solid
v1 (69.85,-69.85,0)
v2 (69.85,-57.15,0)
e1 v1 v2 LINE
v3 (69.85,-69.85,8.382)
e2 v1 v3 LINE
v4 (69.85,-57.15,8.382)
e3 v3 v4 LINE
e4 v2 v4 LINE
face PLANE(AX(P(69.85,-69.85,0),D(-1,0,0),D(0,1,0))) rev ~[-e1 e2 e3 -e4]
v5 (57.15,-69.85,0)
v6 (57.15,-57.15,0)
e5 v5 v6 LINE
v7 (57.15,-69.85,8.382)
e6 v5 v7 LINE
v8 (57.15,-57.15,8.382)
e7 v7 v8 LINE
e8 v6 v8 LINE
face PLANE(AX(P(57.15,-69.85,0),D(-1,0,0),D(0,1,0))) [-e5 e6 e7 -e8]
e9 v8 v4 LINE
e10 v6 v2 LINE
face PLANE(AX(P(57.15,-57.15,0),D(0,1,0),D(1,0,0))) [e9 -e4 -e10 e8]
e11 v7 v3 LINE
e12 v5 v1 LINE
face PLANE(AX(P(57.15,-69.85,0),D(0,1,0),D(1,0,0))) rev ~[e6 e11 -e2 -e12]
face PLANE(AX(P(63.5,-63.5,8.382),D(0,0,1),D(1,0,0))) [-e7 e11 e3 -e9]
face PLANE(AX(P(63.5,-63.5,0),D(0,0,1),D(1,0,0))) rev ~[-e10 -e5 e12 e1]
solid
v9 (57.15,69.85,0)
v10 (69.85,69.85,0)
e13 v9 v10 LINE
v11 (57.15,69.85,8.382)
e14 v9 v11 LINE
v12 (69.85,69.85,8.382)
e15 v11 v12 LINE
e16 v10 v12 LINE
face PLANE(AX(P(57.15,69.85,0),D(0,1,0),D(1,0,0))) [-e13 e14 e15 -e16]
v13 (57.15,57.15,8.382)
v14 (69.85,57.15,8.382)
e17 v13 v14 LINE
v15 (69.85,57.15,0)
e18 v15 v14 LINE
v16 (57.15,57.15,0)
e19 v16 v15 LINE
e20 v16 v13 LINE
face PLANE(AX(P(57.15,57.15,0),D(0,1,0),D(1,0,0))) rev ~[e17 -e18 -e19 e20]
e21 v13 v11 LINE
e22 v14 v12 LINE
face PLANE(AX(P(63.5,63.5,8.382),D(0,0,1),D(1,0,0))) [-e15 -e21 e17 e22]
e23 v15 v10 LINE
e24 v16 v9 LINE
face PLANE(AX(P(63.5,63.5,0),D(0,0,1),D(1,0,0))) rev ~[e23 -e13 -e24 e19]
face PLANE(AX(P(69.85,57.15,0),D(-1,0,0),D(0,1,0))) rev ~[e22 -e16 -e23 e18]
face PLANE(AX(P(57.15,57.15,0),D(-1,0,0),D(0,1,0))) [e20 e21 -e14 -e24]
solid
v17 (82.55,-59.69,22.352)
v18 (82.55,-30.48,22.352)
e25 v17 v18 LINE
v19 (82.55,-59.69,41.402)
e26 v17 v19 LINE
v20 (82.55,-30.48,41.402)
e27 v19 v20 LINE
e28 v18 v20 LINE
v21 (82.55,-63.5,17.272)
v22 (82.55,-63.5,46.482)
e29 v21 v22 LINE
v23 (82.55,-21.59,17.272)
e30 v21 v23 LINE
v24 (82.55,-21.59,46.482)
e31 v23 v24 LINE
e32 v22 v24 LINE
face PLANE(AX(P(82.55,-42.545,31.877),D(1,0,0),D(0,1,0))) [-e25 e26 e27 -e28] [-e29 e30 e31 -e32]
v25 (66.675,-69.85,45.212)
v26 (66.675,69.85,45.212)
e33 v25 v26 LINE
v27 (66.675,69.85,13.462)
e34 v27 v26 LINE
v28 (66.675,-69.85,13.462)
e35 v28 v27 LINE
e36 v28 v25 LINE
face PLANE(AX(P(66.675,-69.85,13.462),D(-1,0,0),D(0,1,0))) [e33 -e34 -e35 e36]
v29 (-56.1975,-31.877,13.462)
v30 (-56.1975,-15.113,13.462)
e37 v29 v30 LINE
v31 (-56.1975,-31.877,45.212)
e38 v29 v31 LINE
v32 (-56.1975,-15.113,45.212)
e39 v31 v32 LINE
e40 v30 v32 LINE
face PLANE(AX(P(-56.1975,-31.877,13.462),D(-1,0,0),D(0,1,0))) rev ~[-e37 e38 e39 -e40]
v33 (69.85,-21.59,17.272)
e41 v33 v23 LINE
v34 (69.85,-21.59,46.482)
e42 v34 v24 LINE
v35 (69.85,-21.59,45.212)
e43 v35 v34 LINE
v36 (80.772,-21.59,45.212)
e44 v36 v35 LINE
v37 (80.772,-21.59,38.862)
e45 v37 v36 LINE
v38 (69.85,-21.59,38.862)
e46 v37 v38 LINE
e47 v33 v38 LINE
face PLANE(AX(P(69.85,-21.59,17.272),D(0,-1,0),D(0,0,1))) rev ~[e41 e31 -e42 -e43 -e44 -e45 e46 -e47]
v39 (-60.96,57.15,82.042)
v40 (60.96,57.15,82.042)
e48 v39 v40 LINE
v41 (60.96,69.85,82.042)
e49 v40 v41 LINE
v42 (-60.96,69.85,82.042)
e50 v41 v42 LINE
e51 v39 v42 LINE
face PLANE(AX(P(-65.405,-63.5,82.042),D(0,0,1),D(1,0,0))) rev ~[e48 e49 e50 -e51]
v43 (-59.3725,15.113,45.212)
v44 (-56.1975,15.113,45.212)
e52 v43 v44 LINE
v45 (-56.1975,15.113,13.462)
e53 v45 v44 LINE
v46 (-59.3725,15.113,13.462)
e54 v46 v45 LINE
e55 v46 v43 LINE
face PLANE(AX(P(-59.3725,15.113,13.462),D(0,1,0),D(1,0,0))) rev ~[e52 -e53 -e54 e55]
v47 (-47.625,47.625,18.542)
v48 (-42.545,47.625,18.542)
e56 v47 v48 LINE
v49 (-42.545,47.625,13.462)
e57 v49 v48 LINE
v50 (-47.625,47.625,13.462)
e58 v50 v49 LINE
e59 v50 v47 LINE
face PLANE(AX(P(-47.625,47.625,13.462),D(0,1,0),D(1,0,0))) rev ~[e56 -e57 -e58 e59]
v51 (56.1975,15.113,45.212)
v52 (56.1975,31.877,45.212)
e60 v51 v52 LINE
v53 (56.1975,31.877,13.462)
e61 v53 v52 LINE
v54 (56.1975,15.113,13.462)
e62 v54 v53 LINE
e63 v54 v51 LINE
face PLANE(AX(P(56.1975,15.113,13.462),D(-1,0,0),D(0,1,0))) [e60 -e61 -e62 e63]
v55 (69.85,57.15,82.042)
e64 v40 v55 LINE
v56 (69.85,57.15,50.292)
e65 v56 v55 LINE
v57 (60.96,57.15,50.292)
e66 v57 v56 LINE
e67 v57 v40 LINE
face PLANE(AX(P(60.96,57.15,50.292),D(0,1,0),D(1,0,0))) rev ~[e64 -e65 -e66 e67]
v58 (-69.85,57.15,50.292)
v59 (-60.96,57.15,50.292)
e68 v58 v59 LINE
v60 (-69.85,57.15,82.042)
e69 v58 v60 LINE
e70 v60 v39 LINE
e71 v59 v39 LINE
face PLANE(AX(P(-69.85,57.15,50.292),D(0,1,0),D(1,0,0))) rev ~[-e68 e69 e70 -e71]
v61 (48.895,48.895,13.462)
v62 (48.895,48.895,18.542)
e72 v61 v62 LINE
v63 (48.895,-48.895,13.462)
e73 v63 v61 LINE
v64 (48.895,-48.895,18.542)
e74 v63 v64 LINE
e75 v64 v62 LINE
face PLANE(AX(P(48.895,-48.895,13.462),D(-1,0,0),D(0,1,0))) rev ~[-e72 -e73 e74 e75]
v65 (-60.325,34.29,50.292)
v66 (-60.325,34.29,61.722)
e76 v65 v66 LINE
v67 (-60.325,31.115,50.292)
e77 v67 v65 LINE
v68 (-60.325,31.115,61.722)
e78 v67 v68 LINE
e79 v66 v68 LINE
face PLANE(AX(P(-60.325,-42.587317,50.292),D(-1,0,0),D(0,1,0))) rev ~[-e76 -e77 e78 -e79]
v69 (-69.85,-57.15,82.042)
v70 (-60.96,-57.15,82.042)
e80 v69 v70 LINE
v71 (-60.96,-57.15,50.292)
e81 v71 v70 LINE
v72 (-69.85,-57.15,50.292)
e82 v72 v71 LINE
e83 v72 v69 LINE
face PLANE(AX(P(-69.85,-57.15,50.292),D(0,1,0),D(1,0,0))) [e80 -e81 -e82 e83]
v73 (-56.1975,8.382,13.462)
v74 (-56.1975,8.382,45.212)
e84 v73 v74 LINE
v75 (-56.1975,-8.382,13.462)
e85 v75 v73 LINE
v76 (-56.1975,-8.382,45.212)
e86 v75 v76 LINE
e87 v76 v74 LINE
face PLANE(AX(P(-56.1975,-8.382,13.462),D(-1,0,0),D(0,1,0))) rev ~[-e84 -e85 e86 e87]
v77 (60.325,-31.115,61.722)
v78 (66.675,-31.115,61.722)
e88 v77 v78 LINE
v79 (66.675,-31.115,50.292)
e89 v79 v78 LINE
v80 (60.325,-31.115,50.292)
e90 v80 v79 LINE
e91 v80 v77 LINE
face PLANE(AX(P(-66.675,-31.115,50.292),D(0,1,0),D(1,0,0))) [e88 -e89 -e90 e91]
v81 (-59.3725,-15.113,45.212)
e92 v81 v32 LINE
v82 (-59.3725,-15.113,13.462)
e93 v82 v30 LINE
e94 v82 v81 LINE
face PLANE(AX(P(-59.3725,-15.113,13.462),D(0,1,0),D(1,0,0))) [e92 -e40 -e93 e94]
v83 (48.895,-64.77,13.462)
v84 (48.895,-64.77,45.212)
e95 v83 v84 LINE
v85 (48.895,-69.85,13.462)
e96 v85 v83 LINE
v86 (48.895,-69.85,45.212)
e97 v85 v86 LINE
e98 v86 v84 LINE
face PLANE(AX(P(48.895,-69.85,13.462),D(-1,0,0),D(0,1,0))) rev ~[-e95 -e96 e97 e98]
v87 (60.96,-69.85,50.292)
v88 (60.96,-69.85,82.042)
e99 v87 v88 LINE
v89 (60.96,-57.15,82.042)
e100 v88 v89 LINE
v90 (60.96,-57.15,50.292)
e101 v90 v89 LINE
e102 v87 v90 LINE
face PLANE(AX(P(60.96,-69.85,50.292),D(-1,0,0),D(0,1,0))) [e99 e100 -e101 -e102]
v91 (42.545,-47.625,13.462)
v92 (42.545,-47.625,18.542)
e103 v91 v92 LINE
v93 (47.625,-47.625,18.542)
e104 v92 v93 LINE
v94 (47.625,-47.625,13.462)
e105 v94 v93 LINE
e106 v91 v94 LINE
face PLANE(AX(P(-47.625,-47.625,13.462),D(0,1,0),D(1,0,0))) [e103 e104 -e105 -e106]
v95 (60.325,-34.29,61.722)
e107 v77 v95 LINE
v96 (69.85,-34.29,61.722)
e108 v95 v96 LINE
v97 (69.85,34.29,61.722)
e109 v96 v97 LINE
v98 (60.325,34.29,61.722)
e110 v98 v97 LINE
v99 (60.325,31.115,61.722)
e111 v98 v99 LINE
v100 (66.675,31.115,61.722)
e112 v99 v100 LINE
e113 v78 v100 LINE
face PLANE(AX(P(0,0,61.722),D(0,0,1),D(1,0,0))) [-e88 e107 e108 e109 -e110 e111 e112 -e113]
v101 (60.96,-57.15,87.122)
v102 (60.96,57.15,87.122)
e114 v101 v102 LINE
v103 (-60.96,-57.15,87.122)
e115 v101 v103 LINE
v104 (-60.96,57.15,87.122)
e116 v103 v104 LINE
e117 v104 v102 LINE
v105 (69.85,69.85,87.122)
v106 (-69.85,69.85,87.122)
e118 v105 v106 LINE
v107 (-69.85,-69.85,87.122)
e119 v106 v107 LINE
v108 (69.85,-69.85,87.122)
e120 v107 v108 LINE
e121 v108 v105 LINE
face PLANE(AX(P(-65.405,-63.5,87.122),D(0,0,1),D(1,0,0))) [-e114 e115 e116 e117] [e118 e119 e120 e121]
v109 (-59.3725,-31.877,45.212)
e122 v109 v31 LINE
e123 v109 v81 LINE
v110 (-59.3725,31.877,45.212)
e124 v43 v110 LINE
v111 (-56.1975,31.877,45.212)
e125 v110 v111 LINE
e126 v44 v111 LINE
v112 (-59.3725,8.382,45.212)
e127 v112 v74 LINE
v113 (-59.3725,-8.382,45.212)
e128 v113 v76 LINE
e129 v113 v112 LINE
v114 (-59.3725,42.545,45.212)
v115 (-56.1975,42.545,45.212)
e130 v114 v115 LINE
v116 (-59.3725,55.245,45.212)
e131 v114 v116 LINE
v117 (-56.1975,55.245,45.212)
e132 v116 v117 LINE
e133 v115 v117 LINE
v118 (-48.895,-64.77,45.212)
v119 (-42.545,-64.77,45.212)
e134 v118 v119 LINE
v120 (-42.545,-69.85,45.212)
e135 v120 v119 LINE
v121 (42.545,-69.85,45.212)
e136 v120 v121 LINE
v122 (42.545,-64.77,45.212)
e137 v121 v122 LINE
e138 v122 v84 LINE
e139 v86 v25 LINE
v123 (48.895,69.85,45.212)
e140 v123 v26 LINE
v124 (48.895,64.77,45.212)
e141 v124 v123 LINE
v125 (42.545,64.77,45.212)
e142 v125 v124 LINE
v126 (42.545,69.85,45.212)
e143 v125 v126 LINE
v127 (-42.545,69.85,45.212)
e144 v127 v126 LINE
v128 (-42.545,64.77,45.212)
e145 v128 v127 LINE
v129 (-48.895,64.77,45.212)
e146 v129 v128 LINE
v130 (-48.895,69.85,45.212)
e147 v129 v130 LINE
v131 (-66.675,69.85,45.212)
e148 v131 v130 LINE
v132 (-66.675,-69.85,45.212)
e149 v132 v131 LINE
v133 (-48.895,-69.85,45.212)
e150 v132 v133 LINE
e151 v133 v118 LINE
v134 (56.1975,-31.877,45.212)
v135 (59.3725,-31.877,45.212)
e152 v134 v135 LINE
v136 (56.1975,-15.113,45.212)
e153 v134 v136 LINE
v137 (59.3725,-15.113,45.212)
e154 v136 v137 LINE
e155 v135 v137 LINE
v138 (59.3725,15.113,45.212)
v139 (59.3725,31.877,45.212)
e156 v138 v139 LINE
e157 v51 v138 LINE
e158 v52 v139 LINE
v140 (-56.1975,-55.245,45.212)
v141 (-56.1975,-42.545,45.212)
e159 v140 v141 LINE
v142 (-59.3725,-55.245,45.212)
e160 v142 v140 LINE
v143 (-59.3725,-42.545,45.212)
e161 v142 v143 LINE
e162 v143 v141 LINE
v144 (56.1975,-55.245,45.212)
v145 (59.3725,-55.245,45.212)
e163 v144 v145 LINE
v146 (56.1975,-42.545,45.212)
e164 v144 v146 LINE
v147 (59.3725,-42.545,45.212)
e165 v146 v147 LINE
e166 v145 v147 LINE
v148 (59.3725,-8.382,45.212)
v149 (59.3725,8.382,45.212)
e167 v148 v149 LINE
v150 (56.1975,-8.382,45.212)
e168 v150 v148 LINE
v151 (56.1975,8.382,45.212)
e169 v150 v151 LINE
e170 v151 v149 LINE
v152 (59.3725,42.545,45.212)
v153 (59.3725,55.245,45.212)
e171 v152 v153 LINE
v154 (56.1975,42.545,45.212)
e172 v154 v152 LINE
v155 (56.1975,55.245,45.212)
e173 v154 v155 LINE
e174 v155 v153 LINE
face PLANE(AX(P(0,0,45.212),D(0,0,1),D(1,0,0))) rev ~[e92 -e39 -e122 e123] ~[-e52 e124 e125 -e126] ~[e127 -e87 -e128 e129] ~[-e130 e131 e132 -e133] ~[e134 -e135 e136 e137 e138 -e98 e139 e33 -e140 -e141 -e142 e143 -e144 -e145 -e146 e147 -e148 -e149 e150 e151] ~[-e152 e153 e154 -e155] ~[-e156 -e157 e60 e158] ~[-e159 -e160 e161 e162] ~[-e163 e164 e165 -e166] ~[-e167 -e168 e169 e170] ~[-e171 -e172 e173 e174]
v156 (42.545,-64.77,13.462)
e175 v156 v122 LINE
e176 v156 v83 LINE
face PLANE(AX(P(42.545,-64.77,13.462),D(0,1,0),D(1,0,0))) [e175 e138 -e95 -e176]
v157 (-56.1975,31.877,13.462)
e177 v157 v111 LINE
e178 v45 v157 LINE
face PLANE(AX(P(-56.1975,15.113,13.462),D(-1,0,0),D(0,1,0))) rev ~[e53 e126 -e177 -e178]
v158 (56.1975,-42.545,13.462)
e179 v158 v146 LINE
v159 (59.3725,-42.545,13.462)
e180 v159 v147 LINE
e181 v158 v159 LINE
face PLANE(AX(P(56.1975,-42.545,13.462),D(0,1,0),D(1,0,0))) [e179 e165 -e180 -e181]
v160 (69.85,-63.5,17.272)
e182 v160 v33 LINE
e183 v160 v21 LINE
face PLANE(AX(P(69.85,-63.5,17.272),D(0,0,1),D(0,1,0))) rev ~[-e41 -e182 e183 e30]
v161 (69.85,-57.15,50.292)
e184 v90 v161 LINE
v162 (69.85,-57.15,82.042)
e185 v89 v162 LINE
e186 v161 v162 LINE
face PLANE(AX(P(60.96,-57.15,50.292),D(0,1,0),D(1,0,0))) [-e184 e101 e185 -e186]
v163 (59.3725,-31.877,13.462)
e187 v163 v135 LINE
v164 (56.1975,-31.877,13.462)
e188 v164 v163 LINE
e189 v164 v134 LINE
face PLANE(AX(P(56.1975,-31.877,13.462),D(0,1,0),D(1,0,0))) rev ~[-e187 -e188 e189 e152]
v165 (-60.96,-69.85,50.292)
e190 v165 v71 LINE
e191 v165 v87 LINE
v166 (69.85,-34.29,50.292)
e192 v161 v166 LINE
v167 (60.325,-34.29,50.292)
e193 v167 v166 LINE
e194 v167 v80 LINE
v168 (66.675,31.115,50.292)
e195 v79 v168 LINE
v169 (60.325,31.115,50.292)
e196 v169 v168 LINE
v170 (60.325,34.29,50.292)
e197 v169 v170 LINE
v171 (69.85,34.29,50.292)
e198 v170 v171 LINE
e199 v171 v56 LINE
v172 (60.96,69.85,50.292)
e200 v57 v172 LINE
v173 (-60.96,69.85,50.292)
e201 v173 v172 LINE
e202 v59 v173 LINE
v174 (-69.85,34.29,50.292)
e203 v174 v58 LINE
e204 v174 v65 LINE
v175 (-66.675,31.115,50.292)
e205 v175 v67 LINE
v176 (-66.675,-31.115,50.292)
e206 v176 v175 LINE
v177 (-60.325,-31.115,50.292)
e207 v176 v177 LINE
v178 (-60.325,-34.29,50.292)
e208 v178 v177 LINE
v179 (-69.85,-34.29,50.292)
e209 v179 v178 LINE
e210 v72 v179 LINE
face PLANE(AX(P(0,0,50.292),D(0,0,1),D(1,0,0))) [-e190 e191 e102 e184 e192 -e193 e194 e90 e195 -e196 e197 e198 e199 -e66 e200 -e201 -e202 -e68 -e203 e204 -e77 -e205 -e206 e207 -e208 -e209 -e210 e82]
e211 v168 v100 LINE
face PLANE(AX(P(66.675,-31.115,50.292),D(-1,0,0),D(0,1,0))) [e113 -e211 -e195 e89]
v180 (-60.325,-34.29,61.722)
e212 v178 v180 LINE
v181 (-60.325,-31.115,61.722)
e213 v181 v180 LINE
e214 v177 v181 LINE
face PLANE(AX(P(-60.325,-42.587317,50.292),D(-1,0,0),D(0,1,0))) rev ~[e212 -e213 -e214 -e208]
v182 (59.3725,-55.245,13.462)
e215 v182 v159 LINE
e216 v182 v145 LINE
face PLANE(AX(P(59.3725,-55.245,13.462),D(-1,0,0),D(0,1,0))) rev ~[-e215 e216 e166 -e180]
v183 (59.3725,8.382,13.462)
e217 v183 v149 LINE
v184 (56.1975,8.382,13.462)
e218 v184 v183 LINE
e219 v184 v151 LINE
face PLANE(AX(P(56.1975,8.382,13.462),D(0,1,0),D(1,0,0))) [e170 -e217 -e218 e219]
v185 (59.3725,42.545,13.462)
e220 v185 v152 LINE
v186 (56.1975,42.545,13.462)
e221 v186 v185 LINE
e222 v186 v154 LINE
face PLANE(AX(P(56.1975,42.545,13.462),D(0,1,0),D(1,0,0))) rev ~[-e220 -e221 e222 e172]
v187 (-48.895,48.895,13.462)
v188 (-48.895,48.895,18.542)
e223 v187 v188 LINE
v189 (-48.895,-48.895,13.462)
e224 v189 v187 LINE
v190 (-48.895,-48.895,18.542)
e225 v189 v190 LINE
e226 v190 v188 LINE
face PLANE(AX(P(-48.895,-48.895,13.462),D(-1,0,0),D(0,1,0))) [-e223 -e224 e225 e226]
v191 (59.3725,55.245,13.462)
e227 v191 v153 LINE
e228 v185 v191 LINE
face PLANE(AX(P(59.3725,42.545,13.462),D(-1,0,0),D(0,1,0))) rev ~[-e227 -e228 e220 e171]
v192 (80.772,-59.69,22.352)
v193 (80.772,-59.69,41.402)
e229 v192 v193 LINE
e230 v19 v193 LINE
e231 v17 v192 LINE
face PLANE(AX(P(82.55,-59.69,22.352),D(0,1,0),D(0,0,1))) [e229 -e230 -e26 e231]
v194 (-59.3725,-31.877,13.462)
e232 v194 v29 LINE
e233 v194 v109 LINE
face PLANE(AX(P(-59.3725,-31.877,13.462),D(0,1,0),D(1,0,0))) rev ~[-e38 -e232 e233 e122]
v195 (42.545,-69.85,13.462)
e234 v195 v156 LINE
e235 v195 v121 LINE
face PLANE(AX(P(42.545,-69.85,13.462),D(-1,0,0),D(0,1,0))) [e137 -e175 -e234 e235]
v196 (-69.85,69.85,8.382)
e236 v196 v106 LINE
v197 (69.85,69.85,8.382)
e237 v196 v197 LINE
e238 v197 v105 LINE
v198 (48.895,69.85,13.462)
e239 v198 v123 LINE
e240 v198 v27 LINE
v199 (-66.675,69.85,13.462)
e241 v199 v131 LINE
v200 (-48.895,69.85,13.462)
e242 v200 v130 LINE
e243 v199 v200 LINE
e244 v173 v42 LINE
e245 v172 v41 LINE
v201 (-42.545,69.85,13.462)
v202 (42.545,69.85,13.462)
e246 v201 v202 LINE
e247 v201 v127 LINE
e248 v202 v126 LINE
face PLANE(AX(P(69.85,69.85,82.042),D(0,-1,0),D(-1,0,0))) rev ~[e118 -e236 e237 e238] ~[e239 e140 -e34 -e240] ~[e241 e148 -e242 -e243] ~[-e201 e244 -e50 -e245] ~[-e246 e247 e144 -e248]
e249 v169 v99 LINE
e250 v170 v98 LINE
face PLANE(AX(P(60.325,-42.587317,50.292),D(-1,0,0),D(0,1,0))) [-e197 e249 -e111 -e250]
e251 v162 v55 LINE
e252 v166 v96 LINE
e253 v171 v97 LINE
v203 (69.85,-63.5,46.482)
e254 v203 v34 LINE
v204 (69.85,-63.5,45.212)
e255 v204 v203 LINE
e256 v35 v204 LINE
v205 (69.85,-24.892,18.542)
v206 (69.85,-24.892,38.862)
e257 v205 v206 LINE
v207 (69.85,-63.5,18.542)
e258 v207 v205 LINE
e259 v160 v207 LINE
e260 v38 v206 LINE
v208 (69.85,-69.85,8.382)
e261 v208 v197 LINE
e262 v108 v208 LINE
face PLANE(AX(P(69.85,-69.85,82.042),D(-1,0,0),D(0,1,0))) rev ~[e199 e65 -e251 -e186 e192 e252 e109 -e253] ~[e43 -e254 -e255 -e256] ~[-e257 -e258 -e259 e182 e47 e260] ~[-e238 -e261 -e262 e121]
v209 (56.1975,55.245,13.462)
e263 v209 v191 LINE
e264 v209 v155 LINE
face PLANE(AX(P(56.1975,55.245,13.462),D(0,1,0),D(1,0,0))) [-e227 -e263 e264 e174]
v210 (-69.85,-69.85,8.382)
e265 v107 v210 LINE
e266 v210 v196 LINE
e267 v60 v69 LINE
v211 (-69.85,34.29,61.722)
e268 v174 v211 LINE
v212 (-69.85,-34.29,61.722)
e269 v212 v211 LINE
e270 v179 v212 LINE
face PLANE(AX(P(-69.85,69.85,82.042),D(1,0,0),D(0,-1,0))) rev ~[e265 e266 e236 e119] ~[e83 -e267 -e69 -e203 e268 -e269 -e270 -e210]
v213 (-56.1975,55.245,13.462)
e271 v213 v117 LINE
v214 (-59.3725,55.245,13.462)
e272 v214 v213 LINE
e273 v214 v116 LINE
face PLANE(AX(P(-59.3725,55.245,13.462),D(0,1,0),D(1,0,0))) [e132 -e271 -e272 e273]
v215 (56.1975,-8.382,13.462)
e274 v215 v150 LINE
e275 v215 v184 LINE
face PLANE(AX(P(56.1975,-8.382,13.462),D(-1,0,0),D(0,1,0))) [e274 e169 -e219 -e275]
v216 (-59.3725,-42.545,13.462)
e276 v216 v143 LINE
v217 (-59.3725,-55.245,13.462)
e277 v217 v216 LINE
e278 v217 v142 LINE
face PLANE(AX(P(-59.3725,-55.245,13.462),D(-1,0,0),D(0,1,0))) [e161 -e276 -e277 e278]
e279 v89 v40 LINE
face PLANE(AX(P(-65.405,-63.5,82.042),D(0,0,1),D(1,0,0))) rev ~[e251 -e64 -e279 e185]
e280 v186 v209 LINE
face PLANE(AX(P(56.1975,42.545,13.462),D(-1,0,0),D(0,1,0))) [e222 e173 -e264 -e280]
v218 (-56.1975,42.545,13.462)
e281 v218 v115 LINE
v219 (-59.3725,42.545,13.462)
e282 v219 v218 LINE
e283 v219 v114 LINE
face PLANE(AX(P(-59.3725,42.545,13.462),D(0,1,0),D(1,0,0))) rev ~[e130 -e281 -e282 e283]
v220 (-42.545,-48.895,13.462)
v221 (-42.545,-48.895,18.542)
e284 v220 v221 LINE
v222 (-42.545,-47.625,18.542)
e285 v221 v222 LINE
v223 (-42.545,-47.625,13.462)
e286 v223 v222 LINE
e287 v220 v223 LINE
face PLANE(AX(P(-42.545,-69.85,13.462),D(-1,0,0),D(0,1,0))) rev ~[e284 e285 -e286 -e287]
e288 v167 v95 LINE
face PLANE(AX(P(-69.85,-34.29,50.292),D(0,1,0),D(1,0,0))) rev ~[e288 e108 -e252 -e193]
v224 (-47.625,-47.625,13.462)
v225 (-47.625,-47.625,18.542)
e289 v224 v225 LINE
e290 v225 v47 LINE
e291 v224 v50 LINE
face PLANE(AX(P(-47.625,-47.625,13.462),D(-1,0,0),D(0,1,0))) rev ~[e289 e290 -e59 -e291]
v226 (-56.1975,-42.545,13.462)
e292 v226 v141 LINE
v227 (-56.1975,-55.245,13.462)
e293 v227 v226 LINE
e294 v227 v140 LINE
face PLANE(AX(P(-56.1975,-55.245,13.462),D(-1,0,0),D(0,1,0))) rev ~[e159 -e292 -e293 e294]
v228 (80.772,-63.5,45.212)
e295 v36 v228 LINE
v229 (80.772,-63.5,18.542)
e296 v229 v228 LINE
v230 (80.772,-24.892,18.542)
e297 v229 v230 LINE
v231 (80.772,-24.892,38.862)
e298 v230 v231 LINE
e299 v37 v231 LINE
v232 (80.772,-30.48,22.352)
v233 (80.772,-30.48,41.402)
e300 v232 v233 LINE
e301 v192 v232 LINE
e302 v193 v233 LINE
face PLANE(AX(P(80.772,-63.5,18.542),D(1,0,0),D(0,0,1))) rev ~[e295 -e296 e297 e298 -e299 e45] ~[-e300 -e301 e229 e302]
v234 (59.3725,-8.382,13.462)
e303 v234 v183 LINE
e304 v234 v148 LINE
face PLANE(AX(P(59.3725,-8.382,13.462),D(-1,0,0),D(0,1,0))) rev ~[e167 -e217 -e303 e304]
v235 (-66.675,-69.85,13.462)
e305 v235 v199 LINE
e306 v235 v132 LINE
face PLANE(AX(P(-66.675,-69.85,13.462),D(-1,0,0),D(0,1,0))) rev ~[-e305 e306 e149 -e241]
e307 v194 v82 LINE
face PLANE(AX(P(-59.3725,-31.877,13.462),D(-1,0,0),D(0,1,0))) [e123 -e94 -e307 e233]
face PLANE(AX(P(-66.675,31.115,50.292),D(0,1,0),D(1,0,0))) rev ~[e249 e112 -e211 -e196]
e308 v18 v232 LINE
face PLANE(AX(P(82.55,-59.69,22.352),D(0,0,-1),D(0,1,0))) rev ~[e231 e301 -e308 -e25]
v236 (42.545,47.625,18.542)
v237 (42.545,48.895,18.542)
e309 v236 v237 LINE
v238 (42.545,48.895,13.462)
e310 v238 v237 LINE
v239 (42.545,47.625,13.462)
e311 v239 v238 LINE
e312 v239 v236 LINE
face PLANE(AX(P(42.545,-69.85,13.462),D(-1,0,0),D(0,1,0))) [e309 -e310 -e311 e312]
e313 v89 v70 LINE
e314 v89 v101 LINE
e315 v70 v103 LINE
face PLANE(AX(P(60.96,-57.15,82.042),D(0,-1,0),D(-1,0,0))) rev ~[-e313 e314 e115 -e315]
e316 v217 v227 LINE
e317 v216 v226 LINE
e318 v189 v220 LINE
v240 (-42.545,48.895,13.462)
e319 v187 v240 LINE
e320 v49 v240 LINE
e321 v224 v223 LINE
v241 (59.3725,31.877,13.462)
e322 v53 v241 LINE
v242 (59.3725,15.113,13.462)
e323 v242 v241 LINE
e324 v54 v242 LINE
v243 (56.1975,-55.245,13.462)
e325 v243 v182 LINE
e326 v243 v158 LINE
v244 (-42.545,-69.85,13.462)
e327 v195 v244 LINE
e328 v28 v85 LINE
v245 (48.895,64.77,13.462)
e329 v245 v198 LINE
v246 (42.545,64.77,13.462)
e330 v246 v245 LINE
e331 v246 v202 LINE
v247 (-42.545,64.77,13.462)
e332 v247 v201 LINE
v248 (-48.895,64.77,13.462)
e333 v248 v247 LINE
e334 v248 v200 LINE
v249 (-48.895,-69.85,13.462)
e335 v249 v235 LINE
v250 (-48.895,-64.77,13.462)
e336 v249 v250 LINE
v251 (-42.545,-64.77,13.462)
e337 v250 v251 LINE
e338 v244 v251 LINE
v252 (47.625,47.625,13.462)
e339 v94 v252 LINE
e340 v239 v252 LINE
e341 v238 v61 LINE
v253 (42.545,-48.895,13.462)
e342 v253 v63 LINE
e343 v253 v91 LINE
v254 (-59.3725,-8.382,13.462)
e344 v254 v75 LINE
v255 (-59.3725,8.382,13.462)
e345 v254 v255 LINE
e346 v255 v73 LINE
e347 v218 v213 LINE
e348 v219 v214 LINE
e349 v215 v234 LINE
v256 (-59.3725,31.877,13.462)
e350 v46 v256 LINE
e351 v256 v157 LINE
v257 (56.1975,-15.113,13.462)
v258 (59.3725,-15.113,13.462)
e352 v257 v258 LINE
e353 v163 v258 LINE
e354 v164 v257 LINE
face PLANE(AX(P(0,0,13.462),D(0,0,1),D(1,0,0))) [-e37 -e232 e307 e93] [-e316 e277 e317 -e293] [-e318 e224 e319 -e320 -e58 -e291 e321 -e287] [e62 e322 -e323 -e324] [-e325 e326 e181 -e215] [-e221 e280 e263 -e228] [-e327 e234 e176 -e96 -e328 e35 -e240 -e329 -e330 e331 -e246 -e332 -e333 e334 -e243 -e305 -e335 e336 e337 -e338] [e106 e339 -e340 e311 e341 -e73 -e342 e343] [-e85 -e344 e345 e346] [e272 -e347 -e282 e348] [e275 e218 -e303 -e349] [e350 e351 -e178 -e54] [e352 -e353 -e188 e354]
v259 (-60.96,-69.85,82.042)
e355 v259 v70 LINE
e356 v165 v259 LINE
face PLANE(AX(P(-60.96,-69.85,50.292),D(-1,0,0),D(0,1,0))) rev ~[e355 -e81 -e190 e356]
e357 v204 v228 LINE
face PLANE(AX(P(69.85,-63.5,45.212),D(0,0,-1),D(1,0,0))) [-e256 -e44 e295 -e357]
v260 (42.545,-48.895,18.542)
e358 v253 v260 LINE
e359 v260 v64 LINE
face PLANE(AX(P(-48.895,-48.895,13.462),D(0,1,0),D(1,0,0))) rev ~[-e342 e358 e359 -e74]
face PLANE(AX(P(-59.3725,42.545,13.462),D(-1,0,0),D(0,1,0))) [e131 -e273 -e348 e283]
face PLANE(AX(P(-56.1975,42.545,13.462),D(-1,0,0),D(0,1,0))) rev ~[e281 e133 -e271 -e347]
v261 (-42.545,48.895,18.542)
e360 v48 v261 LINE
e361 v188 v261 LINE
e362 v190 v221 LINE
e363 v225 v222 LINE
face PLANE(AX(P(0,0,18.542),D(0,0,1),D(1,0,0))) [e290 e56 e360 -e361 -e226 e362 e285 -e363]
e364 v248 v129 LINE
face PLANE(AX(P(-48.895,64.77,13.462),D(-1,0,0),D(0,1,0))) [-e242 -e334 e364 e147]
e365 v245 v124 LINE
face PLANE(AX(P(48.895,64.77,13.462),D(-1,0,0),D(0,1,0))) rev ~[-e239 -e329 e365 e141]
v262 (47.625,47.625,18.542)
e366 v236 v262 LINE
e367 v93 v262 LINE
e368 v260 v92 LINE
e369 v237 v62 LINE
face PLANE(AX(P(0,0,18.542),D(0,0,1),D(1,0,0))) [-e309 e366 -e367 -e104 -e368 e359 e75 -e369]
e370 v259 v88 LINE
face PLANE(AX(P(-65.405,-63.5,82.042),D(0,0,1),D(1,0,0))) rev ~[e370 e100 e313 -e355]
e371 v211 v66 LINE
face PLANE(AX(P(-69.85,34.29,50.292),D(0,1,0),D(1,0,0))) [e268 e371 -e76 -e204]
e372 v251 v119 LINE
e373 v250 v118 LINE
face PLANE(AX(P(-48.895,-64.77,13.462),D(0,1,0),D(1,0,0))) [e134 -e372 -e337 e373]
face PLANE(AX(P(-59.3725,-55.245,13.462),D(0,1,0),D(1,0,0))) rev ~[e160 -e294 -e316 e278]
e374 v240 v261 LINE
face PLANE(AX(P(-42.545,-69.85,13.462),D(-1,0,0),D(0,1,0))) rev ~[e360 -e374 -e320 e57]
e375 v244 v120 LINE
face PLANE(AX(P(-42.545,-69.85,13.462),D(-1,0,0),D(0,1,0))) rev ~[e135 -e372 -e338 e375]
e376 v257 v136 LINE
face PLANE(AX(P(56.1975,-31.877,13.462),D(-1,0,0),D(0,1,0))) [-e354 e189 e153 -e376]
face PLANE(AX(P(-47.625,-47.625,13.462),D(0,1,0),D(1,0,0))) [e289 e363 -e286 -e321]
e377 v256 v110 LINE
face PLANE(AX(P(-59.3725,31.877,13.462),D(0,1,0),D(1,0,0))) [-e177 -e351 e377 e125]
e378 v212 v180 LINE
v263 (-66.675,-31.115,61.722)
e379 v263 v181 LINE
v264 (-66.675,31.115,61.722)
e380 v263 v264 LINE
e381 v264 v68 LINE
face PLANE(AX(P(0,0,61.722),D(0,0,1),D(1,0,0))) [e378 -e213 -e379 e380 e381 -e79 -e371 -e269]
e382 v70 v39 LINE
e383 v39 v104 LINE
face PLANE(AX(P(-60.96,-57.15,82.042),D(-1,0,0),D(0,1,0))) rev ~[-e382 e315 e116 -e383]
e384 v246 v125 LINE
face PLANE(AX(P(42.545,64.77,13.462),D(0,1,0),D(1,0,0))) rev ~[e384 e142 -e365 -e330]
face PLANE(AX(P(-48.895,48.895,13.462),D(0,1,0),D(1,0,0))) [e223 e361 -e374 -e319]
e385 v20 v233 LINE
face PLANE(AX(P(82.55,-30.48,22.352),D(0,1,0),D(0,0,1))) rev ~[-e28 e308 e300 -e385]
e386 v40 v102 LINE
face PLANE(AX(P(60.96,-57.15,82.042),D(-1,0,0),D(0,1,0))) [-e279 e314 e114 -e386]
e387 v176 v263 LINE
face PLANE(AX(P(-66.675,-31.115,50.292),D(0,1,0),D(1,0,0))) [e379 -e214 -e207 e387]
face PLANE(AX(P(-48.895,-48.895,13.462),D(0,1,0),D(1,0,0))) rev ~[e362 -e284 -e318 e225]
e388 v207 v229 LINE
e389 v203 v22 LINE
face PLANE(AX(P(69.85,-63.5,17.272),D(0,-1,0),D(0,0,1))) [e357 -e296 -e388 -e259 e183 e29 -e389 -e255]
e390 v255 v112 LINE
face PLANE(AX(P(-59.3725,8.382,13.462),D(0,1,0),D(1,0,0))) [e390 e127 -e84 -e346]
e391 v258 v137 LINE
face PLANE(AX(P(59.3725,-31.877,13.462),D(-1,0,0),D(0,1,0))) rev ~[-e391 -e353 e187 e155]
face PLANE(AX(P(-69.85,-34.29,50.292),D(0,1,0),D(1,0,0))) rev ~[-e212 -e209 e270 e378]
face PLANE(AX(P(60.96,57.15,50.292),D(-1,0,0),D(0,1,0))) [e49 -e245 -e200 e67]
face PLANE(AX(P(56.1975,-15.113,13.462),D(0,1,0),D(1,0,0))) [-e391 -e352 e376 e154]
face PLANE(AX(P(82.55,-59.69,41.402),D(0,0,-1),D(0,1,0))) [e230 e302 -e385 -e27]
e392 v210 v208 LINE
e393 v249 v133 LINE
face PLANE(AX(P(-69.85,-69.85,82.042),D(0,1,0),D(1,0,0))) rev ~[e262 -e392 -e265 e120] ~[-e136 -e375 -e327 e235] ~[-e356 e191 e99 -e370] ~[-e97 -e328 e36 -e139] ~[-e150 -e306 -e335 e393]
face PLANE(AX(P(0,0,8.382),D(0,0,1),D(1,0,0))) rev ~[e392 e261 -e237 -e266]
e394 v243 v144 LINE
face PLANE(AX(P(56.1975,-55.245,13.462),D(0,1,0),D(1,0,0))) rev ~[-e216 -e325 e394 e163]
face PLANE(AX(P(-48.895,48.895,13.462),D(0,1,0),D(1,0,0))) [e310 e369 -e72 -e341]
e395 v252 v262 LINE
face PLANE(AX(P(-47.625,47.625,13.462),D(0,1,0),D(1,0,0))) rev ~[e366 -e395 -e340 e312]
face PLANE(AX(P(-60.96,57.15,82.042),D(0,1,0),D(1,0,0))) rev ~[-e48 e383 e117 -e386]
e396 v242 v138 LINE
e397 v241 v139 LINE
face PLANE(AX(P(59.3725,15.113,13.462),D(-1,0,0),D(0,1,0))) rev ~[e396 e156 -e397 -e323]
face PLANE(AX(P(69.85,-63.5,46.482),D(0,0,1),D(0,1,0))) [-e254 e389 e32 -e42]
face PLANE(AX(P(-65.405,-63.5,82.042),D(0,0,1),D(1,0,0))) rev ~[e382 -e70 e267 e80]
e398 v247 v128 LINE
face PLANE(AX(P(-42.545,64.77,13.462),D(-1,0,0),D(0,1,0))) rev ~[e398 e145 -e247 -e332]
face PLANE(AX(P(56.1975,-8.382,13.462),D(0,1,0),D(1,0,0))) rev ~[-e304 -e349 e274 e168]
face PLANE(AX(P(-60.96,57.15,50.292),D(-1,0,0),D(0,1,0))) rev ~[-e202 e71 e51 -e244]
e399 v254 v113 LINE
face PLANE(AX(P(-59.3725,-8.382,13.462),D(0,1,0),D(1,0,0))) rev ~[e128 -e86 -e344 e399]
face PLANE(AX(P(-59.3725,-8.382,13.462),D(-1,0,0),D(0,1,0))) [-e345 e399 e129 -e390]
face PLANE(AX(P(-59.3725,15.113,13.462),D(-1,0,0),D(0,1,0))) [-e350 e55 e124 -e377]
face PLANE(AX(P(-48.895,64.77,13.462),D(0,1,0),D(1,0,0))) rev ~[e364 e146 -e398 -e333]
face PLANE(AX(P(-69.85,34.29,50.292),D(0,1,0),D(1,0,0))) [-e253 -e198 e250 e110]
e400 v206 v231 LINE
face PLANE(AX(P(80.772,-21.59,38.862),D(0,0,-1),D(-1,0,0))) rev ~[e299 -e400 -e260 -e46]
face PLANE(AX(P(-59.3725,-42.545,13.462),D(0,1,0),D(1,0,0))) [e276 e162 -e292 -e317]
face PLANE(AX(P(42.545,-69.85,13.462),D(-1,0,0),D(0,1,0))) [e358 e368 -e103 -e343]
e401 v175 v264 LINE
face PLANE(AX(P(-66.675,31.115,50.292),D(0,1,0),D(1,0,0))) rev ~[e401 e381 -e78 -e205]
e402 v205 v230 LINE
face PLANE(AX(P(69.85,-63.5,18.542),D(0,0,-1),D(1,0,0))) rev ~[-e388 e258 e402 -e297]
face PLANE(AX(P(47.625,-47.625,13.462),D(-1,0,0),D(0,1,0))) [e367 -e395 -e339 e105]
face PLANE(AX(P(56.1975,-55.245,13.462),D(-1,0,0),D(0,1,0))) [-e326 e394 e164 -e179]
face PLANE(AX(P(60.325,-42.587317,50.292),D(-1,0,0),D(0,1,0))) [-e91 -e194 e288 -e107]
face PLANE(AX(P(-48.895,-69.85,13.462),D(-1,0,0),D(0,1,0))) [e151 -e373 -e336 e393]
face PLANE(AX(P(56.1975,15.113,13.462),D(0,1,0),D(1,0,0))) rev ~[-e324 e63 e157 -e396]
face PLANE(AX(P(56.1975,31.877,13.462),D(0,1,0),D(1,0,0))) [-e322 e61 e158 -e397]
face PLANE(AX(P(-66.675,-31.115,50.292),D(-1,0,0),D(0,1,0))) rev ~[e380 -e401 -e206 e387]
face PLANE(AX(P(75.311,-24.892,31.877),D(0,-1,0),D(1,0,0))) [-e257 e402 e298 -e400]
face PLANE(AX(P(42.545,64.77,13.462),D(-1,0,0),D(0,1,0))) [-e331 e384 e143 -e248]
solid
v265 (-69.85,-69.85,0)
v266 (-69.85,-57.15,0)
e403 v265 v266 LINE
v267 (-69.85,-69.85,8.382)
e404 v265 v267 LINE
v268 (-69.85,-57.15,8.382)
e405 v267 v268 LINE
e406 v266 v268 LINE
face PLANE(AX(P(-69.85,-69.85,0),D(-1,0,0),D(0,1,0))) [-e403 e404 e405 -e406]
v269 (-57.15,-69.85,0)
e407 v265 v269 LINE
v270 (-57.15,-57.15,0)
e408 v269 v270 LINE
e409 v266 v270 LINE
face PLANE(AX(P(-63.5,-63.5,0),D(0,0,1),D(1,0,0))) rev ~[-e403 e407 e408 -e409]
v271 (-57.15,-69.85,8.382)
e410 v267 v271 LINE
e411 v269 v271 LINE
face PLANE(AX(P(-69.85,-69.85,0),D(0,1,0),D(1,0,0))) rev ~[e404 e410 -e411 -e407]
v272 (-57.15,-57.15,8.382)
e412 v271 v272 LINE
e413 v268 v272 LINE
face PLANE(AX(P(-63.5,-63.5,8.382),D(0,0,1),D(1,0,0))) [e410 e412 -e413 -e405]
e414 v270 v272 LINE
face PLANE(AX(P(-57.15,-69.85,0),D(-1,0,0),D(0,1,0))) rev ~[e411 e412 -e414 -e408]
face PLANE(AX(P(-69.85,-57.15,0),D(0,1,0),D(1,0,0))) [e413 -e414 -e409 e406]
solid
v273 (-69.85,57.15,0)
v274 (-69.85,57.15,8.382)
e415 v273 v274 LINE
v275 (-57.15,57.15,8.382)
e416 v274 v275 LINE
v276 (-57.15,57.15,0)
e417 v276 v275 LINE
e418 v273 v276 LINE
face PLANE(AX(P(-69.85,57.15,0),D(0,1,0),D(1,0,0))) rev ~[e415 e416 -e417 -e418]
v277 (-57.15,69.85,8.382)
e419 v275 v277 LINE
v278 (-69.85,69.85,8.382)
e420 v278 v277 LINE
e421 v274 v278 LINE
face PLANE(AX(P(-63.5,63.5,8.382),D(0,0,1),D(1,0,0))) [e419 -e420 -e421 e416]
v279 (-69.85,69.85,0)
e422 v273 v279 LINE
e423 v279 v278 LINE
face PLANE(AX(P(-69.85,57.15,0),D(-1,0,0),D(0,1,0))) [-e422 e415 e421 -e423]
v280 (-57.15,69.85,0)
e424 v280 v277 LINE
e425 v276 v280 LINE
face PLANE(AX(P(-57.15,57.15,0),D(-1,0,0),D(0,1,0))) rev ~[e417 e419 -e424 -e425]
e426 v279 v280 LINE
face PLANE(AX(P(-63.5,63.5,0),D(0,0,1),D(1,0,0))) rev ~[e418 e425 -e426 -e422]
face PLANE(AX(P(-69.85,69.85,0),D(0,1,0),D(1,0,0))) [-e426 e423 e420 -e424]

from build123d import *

# Parameters (mm, degrees)
F0_W      = 12.7
F0_H      = 12.7
F1_DEPTH  = 8.382
F2_W      = 139.7
F2_H      = 139.7
F3_DEPTH  = 5.08
F5_W      = 97.79
F5_H      = 97.79
F5_W_2    = 95.25
F5_H_2    = 95.25
F6_DEPTH  = 5.08
F7_W      = 85.09
F7_H      = 139.7
F8_DEPTH  = 5.08
F9_W      = 3.175
F9_H      = 139.7
F9_H_2    = 16.764
F9_H_3    = 12.7
F9_W_2    = 6.35
F9_H_4    = 5.08
F10_DEPTH = 31.75
F11_W     = 139.7
F11_H     = 139.7
F12_DEPTH = 5.08
F13_W     = 139.7
F13_H     = 68.58
F13_W_2   = 133.35
F13_H_2   = 62.23
F14_DEPTH = 11.43
F15_W     = 120.65
F15_H     = 85.1746347484
F16_DEPTH = 25.4
F17_W     = 8.89
F17_H     = 12.7
F18_DEPTH = 31.75
F19_W     = 8.89
F19_H     = 12.7
F19_W_2   = 121.92
F19_H_2   = 114.3
F20_DEPTH = 5.08
F21_W     = 41.91
F21_H     = 29.21
F22_DEPTH = 12.7
F23_W     = 10.922
F23_H     = 26.67
F24_DEPTH = 38.608
F25_W     = 10.922
F25_H     = 6.35
F26_DEPTH = 25.4
F27_W     = 29.21
F27_H     = 19.05
F28_DEPTH = 6.35


# Not quite as in the source:
# - a feature names something its author has since deleted; it is built from what else it names


with BuildPart() as f1:
    # F0 (on Top) → F1 (new body)
    with BuildSketch(Plane.XY):
        with Locations((-63.5, -63.5)):
            Rectangle(F0_W, F0_H)
    extrude(amount=F1_DEPTH)


with BuildPart() as f1b:
    # F0 (on Top) → F1, piece 2 (new body)
    with BuildSketch(Plane.XY):
        with Locations((63.5, -63.5)):
            Rectangle(F0_W, F0_H)
    extrude(amount=F1_DEPTH)


with BuildPart() as f1c:
    # F0 (on Top) → F1, piece 3 (new body)
    with BuildSketch(Plane.XY):
        with Locations((63.5, 63.5)):
            Rectangle(F0_W, F0_H)
    extrude(amount=F1_DEPTH)


with BuildPart() as f1d:
    # F0 (on Top) → F1, piece 4 (new body)
    with BuildSketch(Plane.XY):
        with Locations((-63.5, 63.5)):
            Rectangle(F0_W, F0_H)
    extrude(amount=F1_DEPTH)


with BuildPart() as f3:
    # F2 (on face) → F3 (new body)
    with BuildSketch(Plane.XY.offset(8.382)):
        Rectangle(F2_W, F2_H)
    extrude(amount=F3_DEPTH)

    # F5 (on face) → F6 (join)
    with BuildSketch(Plane.XY.offset(13.462)):
        Rectangle(F5_W, F5_H)
        Rectangle(F5_W_2, F5_H_2, mode=Mode.SUBTRACT)
    extrude(amount=F6_DEPTH)

    # F7 (on face) → F8 (cut)
    with BuildSketch(Plane.XY.offset(13.462)):
        Rectangle(F7_W, F7_H)
    extrude(amount=F8_DEPTH, mode=Mode.SUBTRACT)

    # F9 (on face) → F10 (join)
    with BuildSketch(Plane.XY.offset(13.462)):
        with Locations((-68.2625, 0)):
            Rectangle(F9_W, F9_H)
        with Locations((-57.785, 23.495)):
            Rectangle(F9_W, F9_H_2)
        with Locations((-57.785, 0)):
            Rectangle(F9_W, F9_H_2)
        with Locations((-57.785, -23.495)):
            Rectangle(F9_W, F9_H_2)
        with Locations((-57.785, 48.895)):
            Rectangle(F9_W, F9_H_3)
        with Locations((-57.785, -48.895)):
            Rectangle(F9_W, F9_H_3)
        with Locations((-45.72, 67.31)):
            Rectangle(F9_W_2, F9_H_4)
        with Locations((-45.72, -67.31)):
            Rectangle(F9_W_2, F9_H_4)
        with Locations((57.785, 48.895)):
            Rectangle(F9_W, F9_H_3)
        with Locations((45.72, 67.31)):
            Rectangle(F9_W_2, F9_H_4)
        with Locations((57.785, -48.895)):
            Rectangle(F9_W, F9_H_3)
        with Locations((57.785, 23.495)):
            Rectangle(F9_W, F9_H_2)
        with Locations((45.72, -67.31)):
            Rectangle(F9_W_2, F9_H_4)
        with Locations((57.785, -23.495)):
            Rectangle(F9_W, F9_H_2)
        with Locations((68.2625, 0)):
            Rectangle(F9_W, F9_H)
        with Locations((57.785, 0)):
            Rectangle(F9_W, F9_H_2)
    extrude(amount=F10_DEPTH)

    # F11 (on face) → F12 (join)
    with BuildSketch(Plane.XY.offset(45.212)):
        Rectangle(F11_W, F11_H)
    extrude(amount=F12_DEPTH)

    # F13 (on face) → F14 (join)
    with BuildSketch(Plane.XY.offset(50.292)):
        Rectangle(F13_W, F13_H)
        Rectangle(F13_W_2, F13_H_2, mode=Mode.SUBTRACT)
    extrude(amount=F14_DEPTH)

    # F15 (on face) → F16 (cut)
    with BuildSketch(Plane.XY.offset(50.292)):
        Rectangle(F15_W, F15_H)
    extrude(amount=F16_DEPTH, mode=Mode.SUBTRACT)

    # F17 (on face) → F18 (join)
    with BuildSketch(Plane.XY.offset(50.292)):
        with Locations((-65.405, 63.5)):
            Rectangle(F17_W, F17_H)
        with Locations((65.405, 63.5)):
            Rectangle(F17_W, F17_H)
        with Locations((65.405, -63.5)):
            Rectangle(F17_W, F17_H)
        with Locations((-65.405, -63.5)):
            Rectangle(F17_W, F17_H)
    extrude(amount=F18_DEPTH)

    # F19 (on face) → F20 (join)
    with BuildSketch(Plane.XY.offset(82.042)):
        with Locations((-65.405, -63.5)):
            Rectangle(F19_W, F19_H)
        with Locations((0, -63.5)):
            Rectangle(F19_W_2, F19_H)
        with Locations((-65.405, 0)):
            Rectangle(F19_W, F19_H_2)
        with Locations((65.405, -63.5)):
            Rectangle(F19_W, F19_H)
        with Locations((-65.405, 63.5)):
            Rectangle(F19_W, F19_H)
        with Locations((0, 63.5)):
            Rectangle(F19_W_2, F19_H)
        with Locations((65.405, 0)):
            Rectangle(F19_W, F19_H_2)
        with Locations((65.405, 63.5)):
            Rectangle(F19_W, F19_H)
    extrude(amount=F20_DEPTH)

    # F21 (on face) → F22 (join)
    with BuildSketch(Plane.YZ.offset(69.85)):
        with Locations((-42.545, 31.877)):
            Rectangle(F21_W, F21_H)
    extrude(amount=F22_DEPTH)

    # F23 (on face) → F24 (cut)
    with BuildSketch(Plane.XZ.offset(63.5)):
        with Locations((75.311, 31.877)):
            Rectangle(F23_W, F23_H)
    extrude(amount=-F24_DEPTH, mode=Mode.SUBTRACT)

    # F25 (on face) → F26 (cut)
    with BuildSketch(Plane(origin=(0, -21.59, 0), x_dir=(-1, 0, 0), z_dir=(0, 1, 0))):
        with Locations((-75.311, 42.037)):
            Rectangle(F25_W, F25_H)
    extrude(amount=-F26_DEPTH, mode=Mode.SUBTRACT)

    # F27 (on face) → F28 (cut)
    with BuildSketch(Plane.YZ.offset(82.55)):
        with Locations((-45.085, 31.877)):
            Rectangle(F27_W, F27_H)
    extrude(amount=-F28_DEPTH, mode=Mode.SUBTRACT)


solid = Compound([f1.part, f1b.part, f1c.part, f1d.part, f3.part])
